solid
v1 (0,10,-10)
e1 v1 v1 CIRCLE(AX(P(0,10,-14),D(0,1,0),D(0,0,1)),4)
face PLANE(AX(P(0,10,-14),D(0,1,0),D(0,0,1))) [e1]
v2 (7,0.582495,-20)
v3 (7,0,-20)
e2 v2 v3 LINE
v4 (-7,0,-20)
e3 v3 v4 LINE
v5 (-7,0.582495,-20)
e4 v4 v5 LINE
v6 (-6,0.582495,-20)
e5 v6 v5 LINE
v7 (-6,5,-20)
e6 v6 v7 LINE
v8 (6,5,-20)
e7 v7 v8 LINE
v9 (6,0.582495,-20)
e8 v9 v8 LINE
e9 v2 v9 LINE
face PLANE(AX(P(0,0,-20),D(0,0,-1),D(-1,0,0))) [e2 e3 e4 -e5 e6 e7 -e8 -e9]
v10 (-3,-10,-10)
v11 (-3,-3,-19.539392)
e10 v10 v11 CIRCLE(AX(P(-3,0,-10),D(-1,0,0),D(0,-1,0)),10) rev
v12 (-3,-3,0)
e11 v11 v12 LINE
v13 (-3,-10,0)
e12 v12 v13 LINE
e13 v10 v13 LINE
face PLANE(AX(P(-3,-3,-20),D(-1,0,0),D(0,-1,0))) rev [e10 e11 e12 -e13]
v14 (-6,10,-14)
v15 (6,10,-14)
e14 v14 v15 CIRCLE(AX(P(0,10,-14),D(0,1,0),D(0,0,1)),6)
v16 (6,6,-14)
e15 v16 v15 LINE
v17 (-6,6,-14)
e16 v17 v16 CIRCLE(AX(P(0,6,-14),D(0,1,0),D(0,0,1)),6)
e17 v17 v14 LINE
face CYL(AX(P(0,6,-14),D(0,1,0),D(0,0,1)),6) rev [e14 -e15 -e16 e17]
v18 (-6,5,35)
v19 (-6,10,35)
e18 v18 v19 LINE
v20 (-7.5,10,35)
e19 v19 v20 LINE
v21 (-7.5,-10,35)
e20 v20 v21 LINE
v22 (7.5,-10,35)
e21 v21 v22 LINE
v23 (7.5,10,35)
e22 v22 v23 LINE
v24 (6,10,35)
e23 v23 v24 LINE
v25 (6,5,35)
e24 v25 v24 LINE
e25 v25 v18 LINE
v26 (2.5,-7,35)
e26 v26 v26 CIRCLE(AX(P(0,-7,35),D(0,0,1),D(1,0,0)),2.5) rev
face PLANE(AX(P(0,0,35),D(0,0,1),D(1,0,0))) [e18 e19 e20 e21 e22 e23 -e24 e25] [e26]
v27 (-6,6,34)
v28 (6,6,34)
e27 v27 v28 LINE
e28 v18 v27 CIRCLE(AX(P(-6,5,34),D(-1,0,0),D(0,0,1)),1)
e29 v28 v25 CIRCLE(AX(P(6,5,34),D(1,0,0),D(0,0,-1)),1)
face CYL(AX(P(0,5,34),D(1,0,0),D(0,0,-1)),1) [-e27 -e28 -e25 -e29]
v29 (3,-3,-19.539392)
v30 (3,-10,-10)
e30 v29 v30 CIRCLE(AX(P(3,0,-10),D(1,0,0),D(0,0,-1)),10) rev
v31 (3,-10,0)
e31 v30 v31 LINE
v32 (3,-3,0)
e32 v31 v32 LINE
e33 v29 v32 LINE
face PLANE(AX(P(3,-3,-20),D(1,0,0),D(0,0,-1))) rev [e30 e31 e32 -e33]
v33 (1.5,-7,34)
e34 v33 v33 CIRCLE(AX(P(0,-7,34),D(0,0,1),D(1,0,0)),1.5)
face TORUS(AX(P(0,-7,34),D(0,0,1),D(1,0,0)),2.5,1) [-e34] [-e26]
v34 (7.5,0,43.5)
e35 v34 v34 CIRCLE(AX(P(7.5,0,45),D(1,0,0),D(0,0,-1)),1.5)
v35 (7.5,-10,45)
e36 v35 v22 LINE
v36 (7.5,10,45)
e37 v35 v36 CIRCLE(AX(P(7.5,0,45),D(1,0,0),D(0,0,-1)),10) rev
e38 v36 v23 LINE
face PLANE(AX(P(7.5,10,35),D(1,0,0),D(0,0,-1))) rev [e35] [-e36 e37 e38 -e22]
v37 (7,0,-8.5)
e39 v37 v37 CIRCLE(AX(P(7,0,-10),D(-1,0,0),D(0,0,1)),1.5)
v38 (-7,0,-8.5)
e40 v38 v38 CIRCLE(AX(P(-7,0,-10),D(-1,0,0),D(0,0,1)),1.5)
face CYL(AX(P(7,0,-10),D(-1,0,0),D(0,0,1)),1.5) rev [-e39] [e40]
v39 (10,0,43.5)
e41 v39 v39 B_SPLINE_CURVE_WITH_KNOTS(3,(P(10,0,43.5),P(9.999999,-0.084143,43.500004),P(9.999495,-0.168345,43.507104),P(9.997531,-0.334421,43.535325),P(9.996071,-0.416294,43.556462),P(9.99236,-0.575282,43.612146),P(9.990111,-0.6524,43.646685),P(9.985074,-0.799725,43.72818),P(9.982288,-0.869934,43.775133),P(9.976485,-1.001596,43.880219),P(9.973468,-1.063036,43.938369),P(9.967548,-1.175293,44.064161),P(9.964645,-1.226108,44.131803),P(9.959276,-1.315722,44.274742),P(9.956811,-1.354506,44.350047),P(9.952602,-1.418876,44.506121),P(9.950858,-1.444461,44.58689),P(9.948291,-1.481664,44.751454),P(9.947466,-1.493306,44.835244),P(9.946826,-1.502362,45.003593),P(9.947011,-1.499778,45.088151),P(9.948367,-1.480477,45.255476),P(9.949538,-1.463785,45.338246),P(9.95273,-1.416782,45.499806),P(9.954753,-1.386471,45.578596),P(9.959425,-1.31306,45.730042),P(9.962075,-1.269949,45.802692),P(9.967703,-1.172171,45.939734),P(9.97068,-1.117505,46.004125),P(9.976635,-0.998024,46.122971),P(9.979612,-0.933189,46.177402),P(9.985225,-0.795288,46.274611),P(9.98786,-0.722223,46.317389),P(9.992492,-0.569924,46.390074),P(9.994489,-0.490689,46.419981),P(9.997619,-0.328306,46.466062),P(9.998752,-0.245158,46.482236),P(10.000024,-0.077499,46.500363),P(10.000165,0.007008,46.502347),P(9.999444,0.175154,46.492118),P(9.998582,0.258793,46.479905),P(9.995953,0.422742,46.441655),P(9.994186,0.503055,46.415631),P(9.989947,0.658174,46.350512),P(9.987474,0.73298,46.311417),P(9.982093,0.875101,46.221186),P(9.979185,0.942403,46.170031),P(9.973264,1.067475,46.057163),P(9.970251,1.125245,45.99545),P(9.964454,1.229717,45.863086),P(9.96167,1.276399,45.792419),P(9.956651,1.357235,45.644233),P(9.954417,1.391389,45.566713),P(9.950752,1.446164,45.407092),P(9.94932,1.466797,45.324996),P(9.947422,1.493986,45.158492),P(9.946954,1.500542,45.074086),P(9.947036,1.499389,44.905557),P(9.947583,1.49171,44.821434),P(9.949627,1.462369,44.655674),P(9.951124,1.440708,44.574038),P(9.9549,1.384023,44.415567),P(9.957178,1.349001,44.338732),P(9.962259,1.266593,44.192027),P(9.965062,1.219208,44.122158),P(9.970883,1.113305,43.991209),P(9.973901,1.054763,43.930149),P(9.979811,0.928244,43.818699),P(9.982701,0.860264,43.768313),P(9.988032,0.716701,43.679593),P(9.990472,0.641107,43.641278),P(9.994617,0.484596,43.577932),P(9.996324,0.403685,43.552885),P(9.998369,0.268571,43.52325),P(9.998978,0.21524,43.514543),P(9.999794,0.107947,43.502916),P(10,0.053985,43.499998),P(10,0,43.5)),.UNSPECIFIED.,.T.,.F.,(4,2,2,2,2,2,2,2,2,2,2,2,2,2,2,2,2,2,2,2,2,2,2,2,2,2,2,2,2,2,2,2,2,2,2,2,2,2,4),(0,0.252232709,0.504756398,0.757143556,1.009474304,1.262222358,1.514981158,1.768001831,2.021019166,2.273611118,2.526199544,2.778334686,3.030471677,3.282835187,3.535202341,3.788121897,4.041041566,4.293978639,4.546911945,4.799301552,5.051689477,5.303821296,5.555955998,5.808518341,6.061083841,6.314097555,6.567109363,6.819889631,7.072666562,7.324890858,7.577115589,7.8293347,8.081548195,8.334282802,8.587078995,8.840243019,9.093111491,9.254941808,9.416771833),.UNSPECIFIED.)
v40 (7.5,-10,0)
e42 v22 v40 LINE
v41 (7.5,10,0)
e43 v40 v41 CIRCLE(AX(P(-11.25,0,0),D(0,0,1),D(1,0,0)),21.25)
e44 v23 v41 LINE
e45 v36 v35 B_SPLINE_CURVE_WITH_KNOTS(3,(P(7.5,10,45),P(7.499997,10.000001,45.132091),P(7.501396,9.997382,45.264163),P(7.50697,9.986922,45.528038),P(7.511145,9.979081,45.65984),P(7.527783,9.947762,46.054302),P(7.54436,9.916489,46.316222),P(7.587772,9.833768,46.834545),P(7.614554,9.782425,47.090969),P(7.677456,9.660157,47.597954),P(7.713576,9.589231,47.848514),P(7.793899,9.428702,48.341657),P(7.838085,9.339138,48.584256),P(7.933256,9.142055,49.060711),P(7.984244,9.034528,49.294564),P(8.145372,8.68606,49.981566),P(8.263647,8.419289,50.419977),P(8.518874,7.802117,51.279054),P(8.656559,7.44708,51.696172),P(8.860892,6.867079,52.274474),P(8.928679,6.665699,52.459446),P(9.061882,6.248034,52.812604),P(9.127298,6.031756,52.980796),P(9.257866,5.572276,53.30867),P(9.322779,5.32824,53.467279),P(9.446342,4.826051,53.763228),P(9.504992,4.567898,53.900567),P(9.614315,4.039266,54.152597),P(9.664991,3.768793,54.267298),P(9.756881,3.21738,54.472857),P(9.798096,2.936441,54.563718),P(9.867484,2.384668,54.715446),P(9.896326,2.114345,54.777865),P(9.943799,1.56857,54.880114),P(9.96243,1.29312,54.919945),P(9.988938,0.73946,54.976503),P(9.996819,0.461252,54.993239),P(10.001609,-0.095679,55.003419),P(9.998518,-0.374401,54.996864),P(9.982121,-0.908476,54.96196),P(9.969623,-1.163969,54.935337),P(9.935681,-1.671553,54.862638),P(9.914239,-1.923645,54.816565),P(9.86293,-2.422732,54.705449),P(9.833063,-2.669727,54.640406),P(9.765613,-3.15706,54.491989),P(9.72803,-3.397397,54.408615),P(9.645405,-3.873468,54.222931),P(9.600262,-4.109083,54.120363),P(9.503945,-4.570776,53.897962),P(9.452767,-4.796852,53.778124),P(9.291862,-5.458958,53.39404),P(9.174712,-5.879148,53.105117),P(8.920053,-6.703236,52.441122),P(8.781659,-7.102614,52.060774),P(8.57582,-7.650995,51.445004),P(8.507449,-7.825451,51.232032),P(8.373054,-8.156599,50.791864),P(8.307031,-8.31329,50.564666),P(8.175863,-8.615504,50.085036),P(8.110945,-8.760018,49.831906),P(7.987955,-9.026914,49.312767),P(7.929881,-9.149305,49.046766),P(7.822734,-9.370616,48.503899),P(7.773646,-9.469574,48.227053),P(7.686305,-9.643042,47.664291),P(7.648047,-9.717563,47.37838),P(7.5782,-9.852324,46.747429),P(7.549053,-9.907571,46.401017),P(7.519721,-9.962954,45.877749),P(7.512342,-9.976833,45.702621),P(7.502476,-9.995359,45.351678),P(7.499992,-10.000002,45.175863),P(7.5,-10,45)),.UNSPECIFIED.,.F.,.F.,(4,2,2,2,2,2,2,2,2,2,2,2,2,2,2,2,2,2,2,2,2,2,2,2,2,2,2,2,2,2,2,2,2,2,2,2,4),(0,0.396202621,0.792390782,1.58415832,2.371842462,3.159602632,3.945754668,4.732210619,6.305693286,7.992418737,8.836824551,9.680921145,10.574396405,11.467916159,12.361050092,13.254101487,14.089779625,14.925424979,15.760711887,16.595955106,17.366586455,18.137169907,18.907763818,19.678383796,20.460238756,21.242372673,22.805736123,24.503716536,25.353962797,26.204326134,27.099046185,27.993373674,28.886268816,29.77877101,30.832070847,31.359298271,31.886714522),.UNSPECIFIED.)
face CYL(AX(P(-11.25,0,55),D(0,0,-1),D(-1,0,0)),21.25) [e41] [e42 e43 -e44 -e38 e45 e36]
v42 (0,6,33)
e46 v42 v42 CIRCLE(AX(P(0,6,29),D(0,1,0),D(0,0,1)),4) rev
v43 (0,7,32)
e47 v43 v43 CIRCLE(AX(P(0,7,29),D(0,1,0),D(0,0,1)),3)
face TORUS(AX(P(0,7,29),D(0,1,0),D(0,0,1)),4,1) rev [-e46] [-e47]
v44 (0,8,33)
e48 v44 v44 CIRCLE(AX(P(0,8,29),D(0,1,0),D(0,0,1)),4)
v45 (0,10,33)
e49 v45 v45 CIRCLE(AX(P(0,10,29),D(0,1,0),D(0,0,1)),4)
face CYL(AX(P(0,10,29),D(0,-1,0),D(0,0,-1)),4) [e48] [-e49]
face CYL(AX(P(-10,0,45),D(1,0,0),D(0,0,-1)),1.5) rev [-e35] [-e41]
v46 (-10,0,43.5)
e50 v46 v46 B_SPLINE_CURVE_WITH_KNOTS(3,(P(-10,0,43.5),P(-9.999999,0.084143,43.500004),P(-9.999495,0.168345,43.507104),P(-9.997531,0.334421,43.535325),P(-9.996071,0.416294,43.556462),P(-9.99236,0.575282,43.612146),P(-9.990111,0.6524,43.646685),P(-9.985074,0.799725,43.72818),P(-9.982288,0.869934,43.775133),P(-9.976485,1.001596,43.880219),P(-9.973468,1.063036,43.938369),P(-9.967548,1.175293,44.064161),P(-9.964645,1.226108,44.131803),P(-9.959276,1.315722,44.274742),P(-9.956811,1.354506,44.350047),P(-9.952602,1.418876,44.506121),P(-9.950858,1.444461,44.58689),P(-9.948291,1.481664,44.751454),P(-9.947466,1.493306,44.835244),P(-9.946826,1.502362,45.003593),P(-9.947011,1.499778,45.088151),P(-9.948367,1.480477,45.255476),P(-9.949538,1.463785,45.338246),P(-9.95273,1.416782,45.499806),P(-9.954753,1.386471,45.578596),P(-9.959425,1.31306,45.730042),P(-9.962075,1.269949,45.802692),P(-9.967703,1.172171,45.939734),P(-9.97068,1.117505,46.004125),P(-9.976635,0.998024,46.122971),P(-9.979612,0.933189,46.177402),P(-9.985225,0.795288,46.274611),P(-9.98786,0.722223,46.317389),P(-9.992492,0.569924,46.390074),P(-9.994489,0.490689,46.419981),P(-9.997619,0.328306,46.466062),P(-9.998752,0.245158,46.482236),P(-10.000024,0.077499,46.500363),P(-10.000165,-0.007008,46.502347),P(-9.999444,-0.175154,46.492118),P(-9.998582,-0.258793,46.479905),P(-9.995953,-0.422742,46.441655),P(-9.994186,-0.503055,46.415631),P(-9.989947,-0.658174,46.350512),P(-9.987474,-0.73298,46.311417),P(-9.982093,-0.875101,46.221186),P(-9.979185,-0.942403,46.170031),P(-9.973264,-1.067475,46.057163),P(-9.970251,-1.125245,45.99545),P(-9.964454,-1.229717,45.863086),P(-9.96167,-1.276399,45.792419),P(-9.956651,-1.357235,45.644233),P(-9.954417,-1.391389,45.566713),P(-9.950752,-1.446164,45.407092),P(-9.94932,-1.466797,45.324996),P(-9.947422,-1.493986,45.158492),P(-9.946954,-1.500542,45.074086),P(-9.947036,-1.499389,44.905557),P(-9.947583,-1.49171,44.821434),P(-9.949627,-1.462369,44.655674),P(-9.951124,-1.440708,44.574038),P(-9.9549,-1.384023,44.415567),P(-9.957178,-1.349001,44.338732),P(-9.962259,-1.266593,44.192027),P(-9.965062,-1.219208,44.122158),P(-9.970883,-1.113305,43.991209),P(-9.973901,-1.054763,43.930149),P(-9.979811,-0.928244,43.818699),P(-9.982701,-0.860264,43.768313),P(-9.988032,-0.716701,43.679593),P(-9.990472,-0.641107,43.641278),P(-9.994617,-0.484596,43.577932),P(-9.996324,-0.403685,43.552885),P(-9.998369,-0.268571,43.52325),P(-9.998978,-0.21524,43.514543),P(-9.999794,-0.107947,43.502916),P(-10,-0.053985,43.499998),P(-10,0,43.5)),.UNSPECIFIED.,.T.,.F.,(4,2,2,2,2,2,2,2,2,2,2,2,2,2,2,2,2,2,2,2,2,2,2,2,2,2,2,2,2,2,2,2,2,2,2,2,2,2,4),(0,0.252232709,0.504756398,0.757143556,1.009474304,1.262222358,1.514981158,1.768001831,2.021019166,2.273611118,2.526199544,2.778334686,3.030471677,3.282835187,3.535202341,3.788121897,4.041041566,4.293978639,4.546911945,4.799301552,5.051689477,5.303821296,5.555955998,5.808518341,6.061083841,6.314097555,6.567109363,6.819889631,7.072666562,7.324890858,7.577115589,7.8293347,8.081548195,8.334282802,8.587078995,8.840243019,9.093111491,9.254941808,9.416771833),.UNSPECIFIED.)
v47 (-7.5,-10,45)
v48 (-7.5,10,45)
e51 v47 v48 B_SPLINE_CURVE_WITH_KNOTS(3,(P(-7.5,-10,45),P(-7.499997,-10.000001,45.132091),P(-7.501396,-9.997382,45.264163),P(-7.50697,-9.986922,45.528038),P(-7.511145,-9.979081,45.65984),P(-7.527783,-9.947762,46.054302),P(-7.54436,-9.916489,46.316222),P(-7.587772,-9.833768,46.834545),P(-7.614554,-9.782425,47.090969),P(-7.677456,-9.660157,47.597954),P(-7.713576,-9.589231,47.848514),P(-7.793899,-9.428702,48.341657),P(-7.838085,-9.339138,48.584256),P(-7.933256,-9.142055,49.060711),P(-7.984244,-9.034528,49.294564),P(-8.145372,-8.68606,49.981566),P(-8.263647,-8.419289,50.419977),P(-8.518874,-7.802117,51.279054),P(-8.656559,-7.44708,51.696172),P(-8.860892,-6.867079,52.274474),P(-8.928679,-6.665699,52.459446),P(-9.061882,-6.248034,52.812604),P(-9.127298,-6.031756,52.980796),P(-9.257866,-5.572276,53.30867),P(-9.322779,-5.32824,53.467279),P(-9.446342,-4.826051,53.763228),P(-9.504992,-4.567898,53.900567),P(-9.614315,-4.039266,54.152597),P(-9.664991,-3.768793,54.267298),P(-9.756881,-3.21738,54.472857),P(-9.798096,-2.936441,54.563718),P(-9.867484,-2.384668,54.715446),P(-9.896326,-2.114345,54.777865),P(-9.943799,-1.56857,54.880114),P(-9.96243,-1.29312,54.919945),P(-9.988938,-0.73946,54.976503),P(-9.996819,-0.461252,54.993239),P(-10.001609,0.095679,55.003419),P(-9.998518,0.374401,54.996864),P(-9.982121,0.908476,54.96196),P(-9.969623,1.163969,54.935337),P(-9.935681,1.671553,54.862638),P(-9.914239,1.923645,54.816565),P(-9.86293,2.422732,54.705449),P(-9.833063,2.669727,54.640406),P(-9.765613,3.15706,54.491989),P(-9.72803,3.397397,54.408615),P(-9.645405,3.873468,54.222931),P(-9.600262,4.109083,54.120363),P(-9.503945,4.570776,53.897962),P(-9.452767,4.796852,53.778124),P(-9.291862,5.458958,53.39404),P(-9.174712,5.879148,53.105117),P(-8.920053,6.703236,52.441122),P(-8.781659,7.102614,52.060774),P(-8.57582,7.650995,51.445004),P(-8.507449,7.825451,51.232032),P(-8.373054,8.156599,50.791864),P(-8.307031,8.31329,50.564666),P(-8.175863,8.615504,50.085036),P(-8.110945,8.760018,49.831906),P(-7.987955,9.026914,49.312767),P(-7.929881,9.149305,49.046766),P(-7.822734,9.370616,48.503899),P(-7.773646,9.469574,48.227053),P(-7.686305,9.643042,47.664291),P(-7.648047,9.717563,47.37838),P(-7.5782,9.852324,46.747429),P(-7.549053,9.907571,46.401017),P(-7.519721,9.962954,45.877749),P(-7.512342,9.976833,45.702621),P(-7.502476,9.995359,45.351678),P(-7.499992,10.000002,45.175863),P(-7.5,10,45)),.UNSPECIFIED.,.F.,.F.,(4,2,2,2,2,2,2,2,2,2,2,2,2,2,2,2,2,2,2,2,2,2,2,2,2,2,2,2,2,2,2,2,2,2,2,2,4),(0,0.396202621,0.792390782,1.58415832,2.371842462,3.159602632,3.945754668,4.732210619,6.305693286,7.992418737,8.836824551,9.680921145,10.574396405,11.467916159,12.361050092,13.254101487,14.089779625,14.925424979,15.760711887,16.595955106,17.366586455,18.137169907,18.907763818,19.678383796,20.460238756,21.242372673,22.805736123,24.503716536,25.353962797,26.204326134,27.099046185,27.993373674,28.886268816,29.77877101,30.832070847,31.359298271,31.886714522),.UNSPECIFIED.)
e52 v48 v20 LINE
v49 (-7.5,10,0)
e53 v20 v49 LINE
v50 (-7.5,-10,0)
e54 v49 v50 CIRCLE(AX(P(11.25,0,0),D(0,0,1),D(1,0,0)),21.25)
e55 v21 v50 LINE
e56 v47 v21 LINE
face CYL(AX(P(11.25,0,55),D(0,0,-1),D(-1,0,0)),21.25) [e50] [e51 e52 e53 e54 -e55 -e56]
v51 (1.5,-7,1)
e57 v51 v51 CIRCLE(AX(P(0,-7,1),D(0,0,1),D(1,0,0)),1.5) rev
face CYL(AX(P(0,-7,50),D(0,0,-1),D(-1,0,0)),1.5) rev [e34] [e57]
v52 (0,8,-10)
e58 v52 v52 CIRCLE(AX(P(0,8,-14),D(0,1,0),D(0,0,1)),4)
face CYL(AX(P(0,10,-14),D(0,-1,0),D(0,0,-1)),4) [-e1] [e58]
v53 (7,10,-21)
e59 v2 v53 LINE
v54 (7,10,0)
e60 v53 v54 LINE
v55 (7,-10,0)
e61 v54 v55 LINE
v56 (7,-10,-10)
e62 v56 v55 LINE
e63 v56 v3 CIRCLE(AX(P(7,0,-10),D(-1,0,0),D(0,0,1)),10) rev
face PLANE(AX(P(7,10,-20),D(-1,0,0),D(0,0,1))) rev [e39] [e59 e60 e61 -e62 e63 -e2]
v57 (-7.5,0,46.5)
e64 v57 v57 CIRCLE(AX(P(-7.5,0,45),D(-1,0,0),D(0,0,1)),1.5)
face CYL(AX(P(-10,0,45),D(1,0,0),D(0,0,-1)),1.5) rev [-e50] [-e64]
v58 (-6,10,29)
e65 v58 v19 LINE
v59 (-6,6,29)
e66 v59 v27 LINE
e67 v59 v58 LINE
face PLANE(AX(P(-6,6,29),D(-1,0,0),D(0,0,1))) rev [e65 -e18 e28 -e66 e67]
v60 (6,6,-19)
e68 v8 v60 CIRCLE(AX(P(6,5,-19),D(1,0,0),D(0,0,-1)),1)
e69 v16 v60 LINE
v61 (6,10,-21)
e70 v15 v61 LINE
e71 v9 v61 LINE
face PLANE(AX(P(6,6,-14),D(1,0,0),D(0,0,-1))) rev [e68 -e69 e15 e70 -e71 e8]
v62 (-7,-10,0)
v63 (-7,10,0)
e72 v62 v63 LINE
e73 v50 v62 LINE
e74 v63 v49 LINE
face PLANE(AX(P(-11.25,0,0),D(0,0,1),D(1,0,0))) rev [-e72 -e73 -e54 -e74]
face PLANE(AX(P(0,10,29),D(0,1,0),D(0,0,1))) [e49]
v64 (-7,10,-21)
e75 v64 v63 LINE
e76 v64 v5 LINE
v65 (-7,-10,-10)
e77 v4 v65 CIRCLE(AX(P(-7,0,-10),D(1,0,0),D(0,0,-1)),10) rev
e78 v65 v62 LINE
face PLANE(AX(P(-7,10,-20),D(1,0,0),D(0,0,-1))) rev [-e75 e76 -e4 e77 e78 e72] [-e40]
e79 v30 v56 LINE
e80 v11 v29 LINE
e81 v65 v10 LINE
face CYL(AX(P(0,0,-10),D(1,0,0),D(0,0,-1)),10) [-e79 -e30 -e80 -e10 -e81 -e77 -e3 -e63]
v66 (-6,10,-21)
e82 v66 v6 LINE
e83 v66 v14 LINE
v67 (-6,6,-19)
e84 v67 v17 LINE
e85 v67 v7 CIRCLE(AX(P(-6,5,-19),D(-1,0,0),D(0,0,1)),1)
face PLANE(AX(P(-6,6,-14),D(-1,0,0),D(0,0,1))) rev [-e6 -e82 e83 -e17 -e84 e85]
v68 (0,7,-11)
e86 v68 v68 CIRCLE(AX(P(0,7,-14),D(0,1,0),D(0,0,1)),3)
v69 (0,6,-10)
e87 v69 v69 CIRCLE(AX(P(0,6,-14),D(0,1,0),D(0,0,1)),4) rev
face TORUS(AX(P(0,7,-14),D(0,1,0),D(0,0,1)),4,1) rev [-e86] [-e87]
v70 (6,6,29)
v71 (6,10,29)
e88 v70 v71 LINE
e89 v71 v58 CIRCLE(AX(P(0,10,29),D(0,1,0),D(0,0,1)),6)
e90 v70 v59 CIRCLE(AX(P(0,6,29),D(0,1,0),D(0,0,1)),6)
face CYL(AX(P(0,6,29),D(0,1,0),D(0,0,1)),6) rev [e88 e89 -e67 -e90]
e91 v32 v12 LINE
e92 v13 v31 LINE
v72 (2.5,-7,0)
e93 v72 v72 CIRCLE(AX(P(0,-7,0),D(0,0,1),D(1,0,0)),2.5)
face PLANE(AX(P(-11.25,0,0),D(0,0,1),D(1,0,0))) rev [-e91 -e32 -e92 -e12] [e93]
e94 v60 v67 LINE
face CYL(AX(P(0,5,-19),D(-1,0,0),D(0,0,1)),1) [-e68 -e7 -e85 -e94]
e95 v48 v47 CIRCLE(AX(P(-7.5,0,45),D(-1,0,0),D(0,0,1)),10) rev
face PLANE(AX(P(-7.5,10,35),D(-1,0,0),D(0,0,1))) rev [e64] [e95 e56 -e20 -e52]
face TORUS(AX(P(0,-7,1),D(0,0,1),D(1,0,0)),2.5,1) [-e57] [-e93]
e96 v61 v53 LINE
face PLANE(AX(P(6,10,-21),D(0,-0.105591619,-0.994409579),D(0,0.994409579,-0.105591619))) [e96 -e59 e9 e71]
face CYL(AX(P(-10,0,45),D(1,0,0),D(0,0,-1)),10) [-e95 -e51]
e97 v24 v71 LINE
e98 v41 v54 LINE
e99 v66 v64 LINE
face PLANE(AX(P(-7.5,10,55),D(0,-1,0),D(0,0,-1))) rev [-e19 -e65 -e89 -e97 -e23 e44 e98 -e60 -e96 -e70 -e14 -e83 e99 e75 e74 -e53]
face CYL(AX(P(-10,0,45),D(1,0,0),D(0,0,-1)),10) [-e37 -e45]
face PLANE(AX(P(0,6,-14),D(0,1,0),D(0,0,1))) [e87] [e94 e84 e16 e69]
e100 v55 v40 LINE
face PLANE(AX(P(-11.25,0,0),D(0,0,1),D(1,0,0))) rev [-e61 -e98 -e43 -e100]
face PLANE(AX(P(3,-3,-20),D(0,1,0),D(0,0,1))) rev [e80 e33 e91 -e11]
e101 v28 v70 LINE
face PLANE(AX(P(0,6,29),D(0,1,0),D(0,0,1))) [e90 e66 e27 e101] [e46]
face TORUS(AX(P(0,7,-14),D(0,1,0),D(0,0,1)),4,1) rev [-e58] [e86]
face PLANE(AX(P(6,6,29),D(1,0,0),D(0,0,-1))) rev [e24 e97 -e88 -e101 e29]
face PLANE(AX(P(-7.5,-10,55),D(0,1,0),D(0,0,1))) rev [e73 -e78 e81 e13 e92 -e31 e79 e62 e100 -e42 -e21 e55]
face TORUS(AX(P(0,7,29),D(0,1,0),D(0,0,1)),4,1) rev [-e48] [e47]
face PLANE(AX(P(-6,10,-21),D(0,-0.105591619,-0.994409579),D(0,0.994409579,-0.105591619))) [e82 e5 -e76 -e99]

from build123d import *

# Parameters (mm, degrees)
SALIENTE_EXTRUIR2_DEPTH    = 55
CROQUIS4_R                 = 1.5
CORTAR_EXTRUIR1_DEPTH      = 50
SALIENTE_EXTRUIR3_DEPTH    = 20
CROQUIS8_R                 = 1.5
CORTAR_EXTRUIR4_DEPTH      = 14
REDONDEO1_R                = 10
CROQUIS6_W                 = 15
CROQUIS6_H                 = 20
CORTAR_EXTRUIR2_DEPTH      = 20
CORTAR_EXTRUIR3_DEPTH      = 57.789083458
CORTAR_EXTRUIR3_DEPTH_BACK = 57.789083458
CROQUIS7_R                 = 1.5
CUT_EXTRUDE1_DEPTH         = 4
SKETCH2_R                  = 3
BOSS_EXTRUDE1_DEPTH        = 2
SKETCH3_R                  = 4
BOSS_EXTRUDE2_DEPTH        = 2
FILLET1_R                  = 1
FILLET2_R                  = 1
FILLET3_R                  = 1
BOSS_EXTRUDE3_DEPTH        = 1
BOSS_EXTRUDE4_DEPTH        = 1


with BuildPart() as part:
    # Croquis2 → Saliente-Extruir2 (new body)
    with BuildSketch(Plane.XY):
        with BuildLine():
            Line((-7.5, -10), (7.5, -10))
            ThreePointArc((7.5, -10), (10, 0), (7.5, 10))
            Line((7.5, 10), (-7.5, 10))
            ThreePointArc((-7.5, 10), (-10, 0), (-7.5, -10))
        make_face()
    extrude(amount=SALIENTE_EXTRUIR2_DEPTH)

    # Croquis4 → Cortar-Extruir1 (cut)
    with BuildSketch(Plane(origin=(0, 0, 0), x_dir=(-1, 0, 0), z_dir=(0, 0, -1))):
        with Locations((0, -7)):
            Circle(CROQUIS4_R)
    extrude(amount=-CORTAR_EXTRUIR1_DEPTH, mode=Mode.SUBTRACT)

    # Croquis3 → Saliente-Extruir3 (add)
    with BuildSketch(Plane(origin=(0, 0, 0), x_dir=(-1, 0, 0), z_dir=(0, 0, -1))):
        Polygon((7, 10), (7, -10), (3, -10), (3, -3), (-3, -3), (-3, -10), (-7, -10), (-7, 10), align=None)
    extrude(amount=SALIENTE_EXTRUIR3_DEPTH)

    # Croquis8 → Cortar-Extruir4 (cut)
    with BuildSketch(Plane.ZY.offset(7)):
        with Locations((-10, 0)):
            Circle(CROQUIS8_R)
    extrude(amount=-CORTAR_EXTRUIR4_DEPTH, mode=Mode.SUBTRACT)

    # Redondeo1
    redondeo1_edges = [part.edges().sort_by_distance(p)[0] for p in [
        (5, -10, -20),
    ]]
    fillet(redondeo1_edges, radius=REDONDEO1_R)

    # Croquis6 → Cortar-Extruir2 (cut)
    with BuildSketch(Plane.XY.offset(55)):
        Rectangle(CROQUIS6_W, CROQUIS6_H)
    extrude(amount=-CORTAR_EXTRUIR2_DEPTH, mode=Mode.SUBTRACT)

    # Croquis7 → Cortar-Extruir3 (cut, two sides: drawn at the far end of the back side and taken through both)
    with BuildSketch(Plane(origin=(0, 0, 0), x_dir=(0, 0, -1), z_dir=(1, 0, 0)).offset(-CORTAR_EXTRUIR3_DEPTH_BACK)):
        with Locations((-45, 0)):
            Circle(CROQUIS7_R)
        with BuildLine():
            Line((-45, -10), (-60, -10))
            Line((-60, -10), (-60, 10))
            Line((-60, 10), (-45, 10))
            ThreePointArc((-45, 10), (-55, 0), (-45, -10))
        make_face()
    extrude(amount=CORTAR_EXTRUIR3_DEPTH + CORTAR_EXTRUIR3_DEPTH_BACK, mode=Mode.SUBTRACT)

    # Sketch1 → Cut-Extrude1 (cut)
    with BuildSketch(Plane(origin=(0, 10, 0), x_dir=(1, 0, 0), z_dir=(0, 1, 0))):
        with BuildLine():
            Line((-6, 14), (-6, 20))
            Line((-6, 20), (6, 20))
            Line((6, 20), (6, 14))
            ThreePointArc((6, 14), (0, 8), (-6, 14))
        make_face()
        with BuildLine():
            Line((-6, -29), (-6, -35))
            Line((-6, -35), (6, -35))
            Line((6, -35), (6, -29))
            ThreePointArc((6, -29), (0, -23), (-6, -29))
        make_face()
    extrude(amount=-CUT_EXTRUDE1_DEPTH, mode=Mode.SUBTRACT)

    # Sketch2 → Boss-Extrude1 (add)
    with BuildSketch(Plane(origin=(0, 6, 0), x_dir=(1, 0, 0), z_dir=(0, 1, 0))):
        with Locations(Location((0, -29, 0), (0, 0, 270))):
            Circle(SKETCH2_R)
        with Locations(Location((0, 14, 0), (0, 0, 270))):
            Circle(SKETCH2_R)
    extrude(amount=BOSS_EXTRUDE1_DEPTH)

    # Sketch3 → Boss-Extrude2 (add)
    with BuildSketch(Plane(origin=(0, 8, 0), x_dir=(1, 0, 0), z_dir=(0, 1, 0))):
        with Locations(Location((0, 14, 0), (0, 0, 270))):
            Circle(SKETCH3_R)
        with Locations(Location((0, -29, 0), (0, 0, 270))):
            Circle(SKETCH3_R)
    extrude(amount=BOSS_EXTRUDE2_DEPTH)

    # Fillet1
    fillet1_edges = [part.edges().sort_by_distance(p)[0] for p in [
        (0, 6, 26),
        (0, 8, 26),
        (0, 6, -17),
        (0, 8, -17),
    ]]
    fillet(fillet1_edges, radius=FILLET1_R - 0.0001)  # a hair under: the kernel refuses the full size

    # Fillet2
    fillet2_edges = [part.edges().sort_by_distance(p)[0] for p in [
        (0, 6, -20),
        (0, 6, 35),
    ]]
    fillet(fillet2_edges, radius=FILLET2_R)

    # Fillet3
    fillet3_edges = [part.edges().sort_by_distance(p)[0] for p in [
        (1.5, -7, 0),
        (1.5, -7, 35),
    ]]
    fillet(fillet3_edges, radius=FILLET3_R)

    # Sketch4 → Boss-Extrude3 (add)
    with BuildSketch(Plane(origin=(7, 0, 0), x_dir=(0, 0, -1), z_dir=(1, 0, 0))):
        Polygon((20, 10), (21, 10), (19.666009523, -2.562861663), align=None)
    extrude(amount=-BOSS_EXTRUDE3_DEPTH)

    # Sketch5 → Boss-Extrude4 (add)
    with BuildSketch(Plane.ZY.offset(7)):
        Polygon((-20, 10), (-21, 10), (-19.666009523, -2.562861663), align=None)
    extrude(amount=-BOSS_EXTRUDE4_DEPTH)


solid = part.part
